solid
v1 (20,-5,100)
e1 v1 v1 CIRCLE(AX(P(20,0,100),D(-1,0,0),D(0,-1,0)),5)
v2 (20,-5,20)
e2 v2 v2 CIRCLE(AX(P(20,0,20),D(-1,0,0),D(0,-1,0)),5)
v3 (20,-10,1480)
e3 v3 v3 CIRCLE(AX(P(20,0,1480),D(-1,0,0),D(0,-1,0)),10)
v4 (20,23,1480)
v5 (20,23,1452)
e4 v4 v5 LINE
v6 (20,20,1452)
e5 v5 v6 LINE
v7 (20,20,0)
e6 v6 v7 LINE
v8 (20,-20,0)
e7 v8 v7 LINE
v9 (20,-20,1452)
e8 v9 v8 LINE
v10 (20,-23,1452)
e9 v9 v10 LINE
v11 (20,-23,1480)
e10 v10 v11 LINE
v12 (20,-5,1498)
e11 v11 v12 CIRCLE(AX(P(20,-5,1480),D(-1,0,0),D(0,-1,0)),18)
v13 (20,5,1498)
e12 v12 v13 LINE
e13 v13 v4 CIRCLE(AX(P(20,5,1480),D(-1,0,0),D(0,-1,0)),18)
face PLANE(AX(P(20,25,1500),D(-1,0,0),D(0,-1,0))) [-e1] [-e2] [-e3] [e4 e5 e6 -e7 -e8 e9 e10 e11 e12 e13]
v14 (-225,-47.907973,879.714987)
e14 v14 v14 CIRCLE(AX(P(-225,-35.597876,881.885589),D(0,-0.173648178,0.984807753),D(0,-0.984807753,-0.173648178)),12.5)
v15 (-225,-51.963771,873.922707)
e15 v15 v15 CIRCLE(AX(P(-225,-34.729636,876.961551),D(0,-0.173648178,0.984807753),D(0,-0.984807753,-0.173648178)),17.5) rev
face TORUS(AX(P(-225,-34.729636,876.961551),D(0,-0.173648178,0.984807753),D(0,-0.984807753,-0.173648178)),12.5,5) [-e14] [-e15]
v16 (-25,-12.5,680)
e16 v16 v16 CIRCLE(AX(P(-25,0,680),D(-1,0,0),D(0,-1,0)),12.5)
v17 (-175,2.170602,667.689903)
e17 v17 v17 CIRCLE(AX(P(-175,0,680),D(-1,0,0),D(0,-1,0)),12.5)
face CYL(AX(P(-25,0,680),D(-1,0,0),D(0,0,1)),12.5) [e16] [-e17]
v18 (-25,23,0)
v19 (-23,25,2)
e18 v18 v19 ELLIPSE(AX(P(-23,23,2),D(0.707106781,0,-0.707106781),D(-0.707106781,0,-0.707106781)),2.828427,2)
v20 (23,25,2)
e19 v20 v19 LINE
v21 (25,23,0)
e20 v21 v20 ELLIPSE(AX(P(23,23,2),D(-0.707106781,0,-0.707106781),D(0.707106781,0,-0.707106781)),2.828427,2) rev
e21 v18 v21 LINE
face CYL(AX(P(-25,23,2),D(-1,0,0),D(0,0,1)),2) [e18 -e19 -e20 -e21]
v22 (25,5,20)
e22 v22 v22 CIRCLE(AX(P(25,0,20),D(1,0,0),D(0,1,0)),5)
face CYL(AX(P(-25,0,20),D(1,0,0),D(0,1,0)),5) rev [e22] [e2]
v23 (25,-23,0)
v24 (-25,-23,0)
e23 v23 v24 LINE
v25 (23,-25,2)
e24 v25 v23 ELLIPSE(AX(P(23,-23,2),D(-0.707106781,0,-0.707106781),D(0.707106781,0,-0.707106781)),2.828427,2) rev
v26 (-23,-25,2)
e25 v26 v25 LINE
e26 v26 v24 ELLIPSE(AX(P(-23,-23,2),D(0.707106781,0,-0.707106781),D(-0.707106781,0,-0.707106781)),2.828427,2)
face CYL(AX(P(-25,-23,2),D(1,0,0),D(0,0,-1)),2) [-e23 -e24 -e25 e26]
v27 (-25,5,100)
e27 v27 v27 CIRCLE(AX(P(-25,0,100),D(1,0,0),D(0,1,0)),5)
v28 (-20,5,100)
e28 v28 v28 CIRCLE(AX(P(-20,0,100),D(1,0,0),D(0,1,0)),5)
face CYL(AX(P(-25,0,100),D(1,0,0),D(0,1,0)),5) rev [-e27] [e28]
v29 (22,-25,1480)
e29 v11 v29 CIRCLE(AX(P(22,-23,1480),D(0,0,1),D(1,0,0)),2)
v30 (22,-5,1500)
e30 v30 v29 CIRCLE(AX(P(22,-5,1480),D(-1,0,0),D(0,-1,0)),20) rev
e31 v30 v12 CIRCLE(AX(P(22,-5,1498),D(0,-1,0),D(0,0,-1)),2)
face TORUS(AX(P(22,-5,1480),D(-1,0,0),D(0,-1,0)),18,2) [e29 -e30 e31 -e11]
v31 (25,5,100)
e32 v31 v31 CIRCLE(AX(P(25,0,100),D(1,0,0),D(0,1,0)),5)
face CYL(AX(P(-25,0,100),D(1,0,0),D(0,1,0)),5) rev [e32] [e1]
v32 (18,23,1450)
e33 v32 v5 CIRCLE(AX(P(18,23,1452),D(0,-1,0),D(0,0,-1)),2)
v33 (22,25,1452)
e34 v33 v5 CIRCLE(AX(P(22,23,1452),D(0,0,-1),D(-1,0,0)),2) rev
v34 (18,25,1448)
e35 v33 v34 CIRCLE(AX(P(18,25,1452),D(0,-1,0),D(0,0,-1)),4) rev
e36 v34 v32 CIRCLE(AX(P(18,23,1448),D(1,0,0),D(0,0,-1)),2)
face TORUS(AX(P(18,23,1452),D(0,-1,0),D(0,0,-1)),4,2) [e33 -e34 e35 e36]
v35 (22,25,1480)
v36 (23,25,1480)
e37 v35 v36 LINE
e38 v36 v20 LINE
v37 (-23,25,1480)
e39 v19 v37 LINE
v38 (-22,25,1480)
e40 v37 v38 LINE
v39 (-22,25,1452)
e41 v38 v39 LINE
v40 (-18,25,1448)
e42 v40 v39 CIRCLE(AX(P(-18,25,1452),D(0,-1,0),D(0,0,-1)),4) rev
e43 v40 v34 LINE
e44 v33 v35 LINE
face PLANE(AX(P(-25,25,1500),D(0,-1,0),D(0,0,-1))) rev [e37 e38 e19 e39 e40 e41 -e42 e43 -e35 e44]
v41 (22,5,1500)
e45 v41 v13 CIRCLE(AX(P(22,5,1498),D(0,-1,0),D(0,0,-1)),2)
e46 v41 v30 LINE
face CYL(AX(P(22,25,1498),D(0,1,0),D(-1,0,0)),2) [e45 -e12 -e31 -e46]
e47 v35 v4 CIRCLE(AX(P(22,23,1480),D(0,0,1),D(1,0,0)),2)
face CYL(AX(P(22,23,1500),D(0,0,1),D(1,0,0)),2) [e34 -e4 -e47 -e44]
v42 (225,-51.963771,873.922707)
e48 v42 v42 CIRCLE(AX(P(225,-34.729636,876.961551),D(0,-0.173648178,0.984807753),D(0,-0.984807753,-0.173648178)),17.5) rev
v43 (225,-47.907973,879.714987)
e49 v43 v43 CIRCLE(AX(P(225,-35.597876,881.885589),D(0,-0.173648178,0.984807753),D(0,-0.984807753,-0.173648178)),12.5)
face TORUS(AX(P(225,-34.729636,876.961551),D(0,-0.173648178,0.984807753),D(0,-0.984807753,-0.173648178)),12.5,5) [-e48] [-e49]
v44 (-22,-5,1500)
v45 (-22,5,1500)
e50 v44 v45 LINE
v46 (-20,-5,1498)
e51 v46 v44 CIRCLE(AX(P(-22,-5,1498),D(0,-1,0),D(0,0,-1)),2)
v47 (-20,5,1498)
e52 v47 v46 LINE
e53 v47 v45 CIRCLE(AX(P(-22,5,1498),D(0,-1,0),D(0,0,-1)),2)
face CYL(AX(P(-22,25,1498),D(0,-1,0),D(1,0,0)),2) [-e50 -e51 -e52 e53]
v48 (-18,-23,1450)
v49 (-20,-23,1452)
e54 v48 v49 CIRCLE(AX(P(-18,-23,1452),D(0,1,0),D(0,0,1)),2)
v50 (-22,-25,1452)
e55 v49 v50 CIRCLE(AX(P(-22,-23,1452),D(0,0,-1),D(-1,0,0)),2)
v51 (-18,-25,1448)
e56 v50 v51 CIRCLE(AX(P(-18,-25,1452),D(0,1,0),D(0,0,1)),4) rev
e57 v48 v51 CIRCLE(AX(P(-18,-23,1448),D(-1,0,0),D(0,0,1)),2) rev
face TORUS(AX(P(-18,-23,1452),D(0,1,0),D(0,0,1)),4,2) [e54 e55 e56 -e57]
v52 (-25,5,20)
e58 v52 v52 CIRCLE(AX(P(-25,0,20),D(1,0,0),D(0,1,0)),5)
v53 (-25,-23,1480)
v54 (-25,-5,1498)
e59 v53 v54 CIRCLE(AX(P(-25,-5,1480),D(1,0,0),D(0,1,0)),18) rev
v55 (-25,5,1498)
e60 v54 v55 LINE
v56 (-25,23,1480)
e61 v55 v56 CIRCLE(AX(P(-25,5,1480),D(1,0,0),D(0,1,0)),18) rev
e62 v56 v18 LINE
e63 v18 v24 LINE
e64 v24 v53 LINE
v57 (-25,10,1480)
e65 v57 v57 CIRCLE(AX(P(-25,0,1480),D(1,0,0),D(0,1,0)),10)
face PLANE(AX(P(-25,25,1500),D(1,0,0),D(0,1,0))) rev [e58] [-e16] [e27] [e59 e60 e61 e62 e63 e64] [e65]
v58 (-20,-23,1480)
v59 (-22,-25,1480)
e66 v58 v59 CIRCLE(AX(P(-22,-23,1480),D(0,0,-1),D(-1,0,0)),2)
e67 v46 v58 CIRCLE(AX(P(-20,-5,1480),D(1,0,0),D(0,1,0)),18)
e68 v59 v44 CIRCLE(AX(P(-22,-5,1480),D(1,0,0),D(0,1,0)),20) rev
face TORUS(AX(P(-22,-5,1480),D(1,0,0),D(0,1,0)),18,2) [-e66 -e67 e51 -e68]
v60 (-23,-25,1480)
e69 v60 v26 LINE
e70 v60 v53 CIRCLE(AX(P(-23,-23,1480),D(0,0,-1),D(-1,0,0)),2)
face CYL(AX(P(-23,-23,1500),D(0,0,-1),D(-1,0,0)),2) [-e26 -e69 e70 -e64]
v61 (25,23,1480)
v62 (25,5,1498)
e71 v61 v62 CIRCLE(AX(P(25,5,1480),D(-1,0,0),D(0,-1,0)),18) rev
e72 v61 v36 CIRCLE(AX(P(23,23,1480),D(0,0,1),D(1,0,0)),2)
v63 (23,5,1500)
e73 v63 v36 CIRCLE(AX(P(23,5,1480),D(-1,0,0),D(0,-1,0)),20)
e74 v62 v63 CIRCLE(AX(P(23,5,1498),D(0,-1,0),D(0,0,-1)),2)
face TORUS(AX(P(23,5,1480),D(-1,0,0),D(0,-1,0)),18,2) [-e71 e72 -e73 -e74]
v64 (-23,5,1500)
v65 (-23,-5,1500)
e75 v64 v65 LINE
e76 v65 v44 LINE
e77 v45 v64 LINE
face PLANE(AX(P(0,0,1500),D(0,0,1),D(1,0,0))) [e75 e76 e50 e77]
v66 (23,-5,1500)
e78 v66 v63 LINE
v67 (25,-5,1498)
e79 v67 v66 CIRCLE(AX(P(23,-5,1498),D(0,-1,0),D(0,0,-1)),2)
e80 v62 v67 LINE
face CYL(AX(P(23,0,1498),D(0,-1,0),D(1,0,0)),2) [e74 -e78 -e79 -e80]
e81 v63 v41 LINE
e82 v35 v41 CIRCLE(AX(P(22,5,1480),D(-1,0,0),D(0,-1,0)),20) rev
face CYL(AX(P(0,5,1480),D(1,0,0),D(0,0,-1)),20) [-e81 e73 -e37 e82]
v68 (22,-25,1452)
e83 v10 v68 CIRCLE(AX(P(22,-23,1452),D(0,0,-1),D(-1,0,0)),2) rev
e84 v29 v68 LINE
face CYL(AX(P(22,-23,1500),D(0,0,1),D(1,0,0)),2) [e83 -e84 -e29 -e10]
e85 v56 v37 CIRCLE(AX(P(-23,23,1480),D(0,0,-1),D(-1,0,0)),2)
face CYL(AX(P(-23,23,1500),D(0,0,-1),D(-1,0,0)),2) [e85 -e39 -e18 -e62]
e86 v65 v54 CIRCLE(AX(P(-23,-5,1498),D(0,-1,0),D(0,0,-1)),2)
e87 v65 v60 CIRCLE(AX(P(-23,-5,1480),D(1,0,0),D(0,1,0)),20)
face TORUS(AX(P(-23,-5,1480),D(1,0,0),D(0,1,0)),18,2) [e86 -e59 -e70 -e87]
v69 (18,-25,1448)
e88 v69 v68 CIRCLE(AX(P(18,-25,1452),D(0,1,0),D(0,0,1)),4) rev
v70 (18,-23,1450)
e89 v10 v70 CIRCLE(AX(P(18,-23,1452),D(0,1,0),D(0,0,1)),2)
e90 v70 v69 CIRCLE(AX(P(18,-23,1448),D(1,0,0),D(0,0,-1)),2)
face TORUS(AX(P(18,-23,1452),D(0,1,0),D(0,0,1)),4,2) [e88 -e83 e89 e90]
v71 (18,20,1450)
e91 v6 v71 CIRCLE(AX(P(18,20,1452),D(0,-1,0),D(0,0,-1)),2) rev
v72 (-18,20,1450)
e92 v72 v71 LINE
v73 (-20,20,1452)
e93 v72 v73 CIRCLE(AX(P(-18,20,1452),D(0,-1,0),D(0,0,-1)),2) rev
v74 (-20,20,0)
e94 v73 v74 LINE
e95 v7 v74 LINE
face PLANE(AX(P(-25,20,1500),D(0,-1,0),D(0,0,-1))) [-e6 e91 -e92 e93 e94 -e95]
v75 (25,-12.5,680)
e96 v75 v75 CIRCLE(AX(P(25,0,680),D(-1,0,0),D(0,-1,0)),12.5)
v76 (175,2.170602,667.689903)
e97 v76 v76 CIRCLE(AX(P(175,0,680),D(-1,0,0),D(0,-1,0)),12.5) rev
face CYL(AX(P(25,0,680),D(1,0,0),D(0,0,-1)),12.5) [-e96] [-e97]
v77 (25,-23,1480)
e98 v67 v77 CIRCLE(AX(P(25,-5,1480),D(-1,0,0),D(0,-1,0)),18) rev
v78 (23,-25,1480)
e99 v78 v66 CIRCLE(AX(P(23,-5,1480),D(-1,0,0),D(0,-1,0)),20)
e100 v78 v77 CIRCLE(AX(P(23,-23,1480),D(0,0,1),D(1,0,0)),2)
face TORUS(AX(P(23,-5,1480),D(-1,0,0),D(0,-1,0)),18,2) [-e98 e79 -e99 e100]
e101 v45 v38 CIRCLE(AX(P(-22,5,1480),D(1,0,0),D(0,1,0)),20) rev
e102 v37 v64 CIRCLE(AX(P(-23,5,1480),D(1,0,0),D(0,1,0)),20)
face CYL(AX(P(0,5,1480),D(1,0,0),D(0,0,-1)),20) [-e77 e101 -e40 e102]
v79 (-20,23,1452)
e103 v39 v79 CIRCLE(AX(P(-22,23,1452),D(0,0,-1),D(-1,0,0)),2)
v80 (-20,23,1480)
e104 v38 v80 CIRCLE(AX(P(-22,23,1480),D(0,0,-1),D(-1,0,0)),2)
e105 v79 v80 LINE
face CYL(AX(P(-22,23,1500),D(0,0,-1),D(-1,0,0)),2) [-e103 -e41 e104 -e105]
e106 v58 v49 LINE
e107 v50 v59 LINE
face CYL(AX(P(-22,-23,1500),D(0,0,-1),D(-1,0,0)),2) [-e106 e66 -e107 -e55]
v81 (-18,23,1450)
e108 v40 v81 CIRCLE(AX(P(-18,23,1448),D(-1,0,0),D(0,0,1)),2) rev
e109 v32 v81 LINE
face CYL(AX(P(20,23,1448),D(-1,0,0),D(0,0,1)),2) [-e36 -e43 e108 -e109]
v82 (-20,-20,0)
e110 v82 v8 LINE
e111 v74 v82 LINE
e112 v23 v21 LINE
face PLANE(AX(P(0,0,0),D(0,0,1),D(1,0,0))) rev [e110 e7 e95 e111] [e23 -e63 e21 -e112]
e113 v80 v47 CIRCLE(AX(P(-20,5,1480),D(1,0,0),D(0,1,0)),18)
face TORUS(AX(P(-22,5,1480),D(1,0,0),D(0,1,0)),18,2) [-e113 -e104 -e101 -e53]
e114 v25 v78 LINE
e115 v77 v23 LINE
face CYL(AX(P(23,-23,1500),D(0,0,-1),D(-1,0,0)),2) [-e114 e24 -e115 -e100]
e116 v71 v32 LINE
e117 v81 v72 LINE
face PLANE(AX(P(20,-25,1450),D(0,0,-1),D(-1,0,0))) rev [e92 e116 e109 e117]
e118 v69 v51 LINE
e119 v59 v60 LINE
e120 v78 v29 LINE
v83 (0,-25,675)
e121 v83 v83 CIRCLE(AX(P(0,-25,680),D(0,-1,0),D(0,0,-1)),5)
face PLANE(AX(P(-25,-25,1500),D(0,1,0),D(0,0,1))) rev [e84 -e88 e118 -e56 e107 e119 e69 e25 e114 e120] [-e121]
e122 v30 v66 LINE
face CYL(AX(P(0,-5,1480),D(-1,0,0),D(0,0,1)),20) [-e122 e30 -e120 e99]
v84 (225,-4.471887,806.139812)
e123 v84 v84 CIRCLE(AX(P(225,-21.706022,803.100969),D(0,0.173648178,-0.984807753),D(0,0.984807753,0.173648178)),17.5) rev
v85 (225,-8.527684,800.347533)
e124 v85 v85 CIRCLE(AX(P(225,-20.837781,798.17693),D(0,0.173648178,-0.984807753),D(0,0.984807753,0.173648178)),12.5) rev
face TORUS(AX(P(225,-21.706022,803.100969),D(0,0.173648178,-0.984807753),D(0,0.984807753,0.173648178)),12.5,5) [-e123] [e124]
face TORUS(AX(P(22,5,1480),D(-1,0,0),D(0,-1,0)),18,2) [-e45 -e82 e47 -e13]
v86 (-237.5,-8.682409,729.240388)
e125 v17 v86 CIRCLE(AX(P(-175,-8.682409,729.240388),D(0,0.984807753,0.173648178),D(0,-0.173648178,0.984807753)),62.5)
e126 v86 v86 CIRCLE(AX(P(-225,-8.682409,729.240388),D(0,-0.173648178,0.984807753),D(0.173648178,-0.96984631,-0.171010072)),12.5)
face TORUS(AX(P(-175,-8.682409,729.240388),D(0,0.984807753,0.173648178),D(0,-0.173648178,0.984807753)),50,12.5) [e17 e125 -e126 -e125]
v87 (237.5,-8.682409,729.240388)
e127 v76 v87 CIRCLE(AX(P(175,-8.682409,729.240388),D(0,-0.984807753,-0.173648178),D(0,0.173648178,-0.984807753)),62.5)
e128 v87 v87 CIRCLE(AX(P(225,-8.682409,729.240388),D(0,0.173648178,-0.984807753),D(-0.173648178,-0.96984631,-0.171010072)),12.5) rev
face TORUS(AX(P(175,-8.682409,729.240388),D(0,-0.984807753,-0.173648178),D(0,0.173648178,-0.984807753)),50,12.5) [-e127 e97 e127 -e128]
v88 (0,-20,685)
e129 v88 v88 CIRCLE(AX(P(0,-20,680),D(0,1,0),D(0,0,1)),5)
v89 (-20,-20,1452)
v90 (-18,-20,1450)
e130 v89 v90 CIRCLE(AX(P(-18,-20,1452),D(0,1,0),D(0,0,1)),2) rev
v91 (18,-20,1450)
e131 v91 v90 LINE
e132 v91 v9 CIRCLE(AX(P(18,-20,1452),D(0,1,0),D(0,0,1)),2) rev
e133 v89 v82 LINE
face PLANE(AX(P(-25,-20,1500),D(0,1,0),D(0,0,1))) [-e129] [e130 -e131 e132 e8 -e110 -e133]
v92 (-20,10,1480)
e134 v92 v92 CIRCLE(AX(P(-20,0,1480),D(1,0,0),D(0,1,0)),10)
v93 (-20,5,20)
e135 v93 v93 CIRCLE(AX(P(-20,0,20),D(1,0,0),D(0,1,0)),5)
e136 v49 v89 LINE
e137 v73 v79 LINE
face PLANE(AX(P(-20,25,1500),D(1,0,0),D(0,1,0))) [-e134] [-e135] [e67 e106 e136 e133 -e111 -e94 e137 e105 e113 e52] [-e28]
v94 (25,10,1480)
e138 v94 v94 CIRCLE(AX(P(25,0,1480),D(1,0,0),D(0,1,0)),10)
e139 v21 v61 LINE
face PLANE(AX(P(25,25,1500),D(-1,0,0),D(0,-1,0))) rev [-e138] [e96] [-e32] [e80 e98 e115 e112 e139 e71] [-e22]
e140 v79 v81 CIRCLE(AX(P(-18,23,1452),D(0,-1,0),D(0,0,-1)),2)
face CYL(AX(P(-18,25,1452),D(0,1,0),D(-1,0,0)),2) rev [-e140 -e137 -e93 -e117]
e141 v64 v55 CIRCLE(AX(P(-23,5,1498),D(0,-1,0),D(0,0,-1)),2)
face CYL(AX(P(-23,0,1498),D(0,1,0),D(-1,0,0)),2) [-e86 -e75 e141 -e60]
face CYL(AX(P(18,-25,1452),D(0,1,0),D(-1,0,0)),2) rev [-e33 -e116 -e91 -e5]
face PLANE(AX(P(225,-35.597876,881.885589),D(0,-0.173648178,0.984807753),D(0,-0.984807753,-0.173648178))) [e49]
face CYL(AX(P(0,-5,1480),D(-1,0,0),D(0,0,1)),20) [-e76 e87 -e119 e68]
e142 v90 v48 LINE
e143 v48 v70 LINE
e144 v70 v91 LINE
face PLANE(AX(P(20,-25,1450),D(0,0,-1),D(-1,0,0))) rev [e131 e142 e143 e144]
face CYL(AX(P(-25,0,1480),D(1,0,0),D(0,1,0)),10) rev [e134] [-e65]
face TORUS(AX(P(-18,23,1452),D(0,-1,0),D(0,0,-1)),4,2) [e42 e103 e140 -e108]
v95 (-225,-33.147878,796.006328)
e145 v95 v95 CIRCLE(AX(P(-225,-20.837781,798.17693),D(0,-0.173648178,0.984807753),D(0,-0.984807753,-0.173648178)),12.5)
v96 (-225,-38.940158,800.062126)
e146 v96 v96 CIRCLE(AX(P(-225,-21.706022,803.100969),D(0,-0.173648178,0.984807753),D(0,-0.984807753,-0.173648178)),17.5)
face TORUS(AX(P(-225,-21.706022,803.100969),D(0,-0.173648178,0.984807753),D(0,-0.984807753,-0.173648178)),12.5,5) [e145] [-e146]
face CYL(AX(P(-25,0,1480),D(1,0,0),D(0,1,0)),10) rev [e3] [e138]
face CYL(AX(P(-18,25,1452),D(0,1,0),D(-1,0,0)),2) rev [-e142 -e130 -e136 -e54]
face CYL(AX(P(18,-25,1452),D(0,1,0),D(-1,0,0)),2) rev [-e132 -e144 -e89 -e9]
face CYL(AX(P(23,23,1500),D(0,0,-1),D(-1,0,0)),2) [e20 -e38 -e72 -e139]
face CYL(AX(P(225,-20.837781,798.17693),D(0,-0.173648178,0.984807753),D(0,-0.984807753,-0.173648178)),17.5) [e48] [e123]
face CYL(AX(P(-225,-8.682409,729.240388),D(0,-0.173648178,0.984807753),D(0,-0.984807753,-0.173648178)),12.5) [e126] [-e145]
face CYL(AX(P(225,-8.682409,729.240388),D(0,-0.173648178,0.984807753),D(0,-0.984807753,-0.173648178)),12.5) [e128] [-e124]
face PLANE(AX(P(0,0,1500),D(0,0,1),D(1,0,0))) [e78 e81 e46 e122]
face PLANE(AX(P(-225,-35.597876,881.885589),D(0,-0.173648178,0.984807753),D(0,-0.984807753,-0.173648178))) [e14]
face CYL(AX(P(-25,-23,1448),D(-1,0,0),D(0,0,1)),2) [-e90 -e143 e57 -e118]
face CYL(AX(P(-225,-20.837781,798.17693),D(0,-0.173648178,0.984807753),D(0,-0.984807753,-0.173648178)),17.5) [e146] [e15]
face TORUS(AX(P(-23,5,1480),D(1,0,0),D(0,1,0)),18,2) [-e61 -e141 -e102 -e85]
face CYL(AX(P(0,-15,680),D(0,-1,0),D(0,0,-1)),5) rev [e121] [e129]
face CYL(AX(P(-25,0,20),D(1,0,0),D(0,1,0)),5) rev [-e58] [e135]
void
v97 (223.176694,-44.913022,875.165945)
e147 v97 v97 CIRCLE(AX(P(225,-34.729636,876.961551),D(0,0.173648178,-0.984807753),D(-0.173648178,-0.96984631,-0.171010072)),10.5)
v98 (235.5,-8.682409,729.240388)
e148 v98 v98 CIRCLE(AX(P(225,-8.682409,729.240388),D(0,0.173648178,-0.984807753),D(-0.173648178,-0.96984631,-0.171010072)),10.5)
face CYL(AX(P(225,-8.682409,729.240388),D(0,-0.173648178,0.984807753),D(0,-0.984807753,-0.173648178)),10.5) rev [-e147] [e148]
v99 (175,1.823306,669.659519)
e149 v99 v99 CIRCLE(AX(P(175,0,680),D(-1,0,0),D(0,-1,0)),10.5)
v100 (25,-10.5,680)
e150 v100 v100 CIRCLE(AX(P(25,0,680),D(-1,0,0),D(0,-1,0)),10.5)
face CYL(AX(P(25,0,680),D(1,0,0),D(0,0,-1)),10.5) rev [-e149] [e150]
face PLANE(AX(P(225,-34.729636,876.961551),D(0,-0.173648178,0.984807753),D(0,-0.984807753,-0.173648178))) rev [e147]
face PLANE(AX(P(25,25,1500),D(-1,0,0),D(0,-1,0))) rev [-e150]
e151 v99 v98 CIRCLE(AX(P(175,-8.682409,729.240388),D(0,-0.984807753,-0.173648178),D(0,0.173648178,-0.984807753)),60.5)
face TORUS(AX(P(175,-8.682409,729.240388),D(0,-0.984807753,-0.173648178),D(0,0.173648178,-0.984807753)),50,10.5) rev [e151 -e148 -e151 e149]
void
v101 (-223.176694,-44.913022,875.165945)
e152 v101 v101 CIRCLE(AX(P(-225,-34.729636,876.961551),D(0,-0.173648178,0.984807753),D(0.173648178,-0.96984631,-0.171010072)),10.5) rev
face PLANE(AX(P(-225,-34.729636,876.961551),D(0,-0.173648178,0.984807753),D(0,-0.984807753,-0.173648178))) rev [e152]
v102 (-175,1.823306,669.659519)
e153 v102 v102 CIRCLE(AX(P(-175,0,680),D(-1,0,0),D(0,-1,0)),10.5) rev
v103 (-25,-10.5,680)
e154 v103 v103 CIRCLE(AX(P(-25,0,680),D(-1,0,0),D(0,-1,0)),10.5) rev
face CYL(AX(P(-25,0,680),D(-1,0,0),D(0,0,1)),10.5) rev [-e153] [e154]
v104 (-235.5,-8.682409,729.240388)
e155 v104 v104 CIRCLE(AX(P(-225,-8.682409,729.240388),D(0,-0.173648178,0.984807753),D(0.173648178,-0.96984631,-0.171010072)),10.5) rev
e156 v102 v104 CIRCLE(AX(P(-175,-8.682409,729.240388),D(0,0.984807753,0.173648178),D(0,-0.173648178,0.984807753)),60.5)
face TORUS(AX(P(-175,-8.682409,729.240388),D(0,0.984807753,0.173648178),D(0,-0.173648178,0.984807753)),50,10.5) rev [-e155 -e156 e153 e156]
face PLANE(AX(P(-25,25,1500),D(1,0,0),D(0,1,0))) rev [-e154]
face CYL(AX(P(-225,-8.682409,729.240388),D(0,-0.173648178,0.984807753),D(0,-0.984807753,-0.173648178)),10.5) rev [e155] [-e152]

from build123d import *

# Parameters (mm, degrees)
SKETCH_1_W             = 50
SKETCH_1_H             = 50
SKETCH_1_W_2           = 40
SKETCH_1_H_2           = 40
EXTRUDE_1_DEPTH        = 1500
SKETCH_2_R             = 5
SKETCH_2_R_2           = 10
CUT_EXTRUDE_1_DEPTH    = 1502.041305228
SKETCH_4_W             = 40
SKETCH_4_H             = 50
CUT_EXTRUDE_2_DEPTH    = 1502.041305228
FILLET_1_R             = 20
FILLET_6_R             = 2
SKETCH_7_R             = 5
CUT_EXTRUDE_3_DEPTH    = 10
SKETCH_8_R             = 12.5
SKETCH_8_R_2           = 10.5
SKETCH_10_R            = 17.5
SKETCH_10_R_2          = 12.5
EXTRUDE_2_DEPTH        = 80
EXTRUDE_START          = 5
SKETCH_11_R            = 17.5
EXTRUDE_1_2_DEPTH      = 5
FILLET_7_R             = 5
FILLET_7_OF_MIRROR_1_R = 5


with BuildPart() as part:
    # 草图1 → Extrude 1 (new body)
    with BuildSketch(Plane.XY):
        Rectangle(SKETCH_1_W, SKETCH_1_H)
        Rectangle(SKETCH_1_W_2, SKETCH_1_H_2, mode=Mode.SUBTRACT)
    extrude(amount=EXTRUDE_1_DEPTH)

    # 草图2 → 切除-拉伸1 (cut, through all)
    with BuildSketch(Plane(origin=(25, 0, 0), x_dir=(0, 0, -1), z_dir=(1, 0, 0))):
        with Locations(Location((-20, 0, 0), (0, 0, 90))):
            Circle(SKETCH_2_R)
        with Locations(Location((-100, 0, 0), (0, 0, 90))):
            Circle(SKETCH_2_R)
        with Locations(Location((-1480, 0, 0), (0, 0, 90))):
            Circle(SKETCH_2_R_2)
    extrude(amount=-CUT_EXTRUDE_1_DEPTH, mode=Mode.SUBTRACT)

    # 草图4 → 切除-拉伸2 (cut, through all)
    with BuildSketch(Plane(origin=(0, 25, 0), x_dir=(1, 0, 0), z_dir=(0, 1, 0))):
        with Locations((0, -1475)):
            Rectangle(SKETCH_4_W, SKETCH_4_H)
    extrude(amount=-CUT_EXTRUDE_2_DEPTH, mode=Mode.SUBTRACT)

    # 圆角1
    fillet_1_edges = [part.edges().sort_by_distance(p)[0] for p in [
        (22.5, 25, 1500),
        (-22.5, 25, 1500),
        (22.5, -25, 1500),
        (-22.5, -25, 1500),
    ]]
    fillet(fillet_1_edges, radius=FILLET_1_R)

    # 圆角6
    fillet_6_edges = [part.edges().sort_by_distance(p)[0] for p in [
        (0, 25, 0),
        (0, -25, 0),
        (0, -25, 1450),
        (-20, -22.5, 1450),
        (20, -22.5, 1450),
        (20, 22.5, 1450),
        (-20, -25, 1465),
        (-20, 22.5, 1450),
        (0, 25, 1450),
        (-20, 25, 1465),
        (20, 0, 1500),
        (25, 0, 1500),
        (25, 25, 740),
        (25, -25, 740),
        (25, 19.142135624, 1494.142135624),
        (25, -19.142135624, 1494.142135624),
        (20, -25, 1465),
        (-25, -25, 740),
        (20, 25, 1465),
        (20, 19.142135624, 1494.142135624),
        (20, -19.142135624, 1494.142135624),
        (-20, 0, 1500),
        (-25, 0, 1500),
        (-20, 19.142135624, 1494.142135624),
        (-20, -19.142135624, 1494.142135624),
        (-25, 25, 740),
        (-25, 19.142135624, 1494.142135624),
        (-25, -19.142135624, 1494.142135624),
    ]]
    fillet(fillet_6_edges, radius=FILLET_6_R)

    # 草图7 → 切除-拉伸3 (cut)
    with BuildSketch(Plane.XZ.offset(25)):
        with Locations(Location((0, 680, 0), (0, 0, 270))):
            Circle(SKETCH_7_R)
    extrude(amount=-CUT_EXTRUDE_3_DEPTH, mode=Mode.SUBTRACT)

    # 扫描1: sweep along a path in 草图9
    with BuildLine(Plane(origin=(0, 116.286848731, 20.504508933), x_dir=(1, 0, 0), z_dir=(0, 0.984807753012208, 0.17364817766693072))) as sweep_1_path:
        Line((-25, -669.669272048), (-175, -669.669272048))
        ThreePointArc((-175, -669.669272048), (-210.355339059, -684.313932989), (-225, -719.669272048))
        Line((-225, -719.669272048), (-225, -869.669272048))
    # 草图8 → 扫描1 (sweep)
    with BuildSketch(Plane.ZY.offset(25)):
        with Locations((680, 0)):
            Circle(SKETCH_8_R)
        with Locations((680, 0)):
            Circle(SKETCH_8_R_2, mode=Mode.SUBTRACT)
    sweep_1 = sweep(path=sweep_1_path.line)

    # 草图10 → 拉伸-薄壁2 (add)
    with BuildSketch(Plane(origin=(0, -151.016484264, 856.45704167), x_dir=(1, 0, 0), z_dir=(0, -0.17364817766693091, 0.9848077530122081))):
        with Locations((-225, 118.080760814)):
            Circle(SKETCH_10_R)
        with Locations((-225, 118.080760814)):
            Circle(SKETCH_10_R_2, mode=Mode.SUBTRACT)
    extrude_2 = extrude(amount=-EXTRUDE_2_DEPTH)

    # 草图11 → Extrude 1 2 (add)
    with BuildSketch(Plane(origin=(0, -151.016484264, 856.45704167), x_dir=(1, 0, 0), z_dir=(0, -0.17364817766693091, 0.9848077530122081)).offset(EXTRUDE_START)):
        with Locations(Location((-225, 118.080760814, 0), (0, 0, 270))):
            Circle(SKETCH_11_R)
    extrude_1_2 = extrude(amount=-EXTRUDE_1_2_DEPTH)

    # 圆角7
    # the kernel refuses this fillet: 5 mm, written as the material it takes off along each edge
    with BuildSketch(Plane(origin=(-225, -20.83778132, 798.176930361), x_dir=(1, 0, 0), z_dir=(0, -0.9848077530122081, -0.17364817766693091))) as fillet_7_piece_1:
        with BuildLine():
            CenterArc((17.5 - FILLET_7_R, FILLET_7_R), FILLET_7_R, 270, 90)
            Line((17.5, FILLET_7_R), (17.5, 0))
            Line((17.5, 0), (17.5 - FILLET_7_R, 0))
        make_face()
    revolve(axis=Axis((-225, -20.83778132, 798.176930361), (0, -0.17364817766693091, 0.9848077530122081)), mode=Mode.SUBTRACT)
    with BuildSketch(Plane(origin=(-225, -35.597876422, 881.885589368), x_dir=(0, -0.9848077530122085, -0.17364817766692792), z_dir=(-1, 0, 0))) as fillet_7_piece_2:
        with BuildLine():
            CenterArc((17.5 - FILLET_7_R, -FILLET_7_R), FILLET_7_R, 0, 90)
            Line((17.5 - FILLET_7_R, 0), (17.5, 0))
            Line((17.5, 0), (17.5, -FILLET_7_R))
        make_face()
    revolve(axis=Axis((-225, -35.597876422, 881.885589368), (0, -0.17364817766693091, 0.9848077530122081)), mode=Mode.SUBTRACT)

    # 镜向1: 扫描1, 拉伸-薄壁2, Extrude 1 2 across plane
    add(sweep_1.mirror(Plane.ZY))
    add(extrude_2.mirror(Plane.ZY))
    add(extrude_1_2.mirror(Plane.ZY))

    # 圆角7 of 镜向1
    # the kernel refuses this fillet: 5 mm, written as the material it takes off along each edge
    with BuildSketch(Plane(origin=(225, -20.83778132, 798.176930361), x_dir=(-1, 0, 0), z_dir=(0, -0.9848077530122081, -0.17364817766693091))) as fillet_7_of_mirror_1_piece_1:
        with BuildLine():
            CenterArc((17.5 - FILLET_7_OF_MIRROR_1_R, -FILLET_7_OF_MIRROR_1_R), FILLET_7_OF_MIRROR_1_R, 360, 90)
            Line((17.5, -FILLET_7_OF_MIRROR_1_R), (17.5, 0))
            Line((17.5, 0), (17.5 - FILLET_7_OF_MIRROR_1_R, 0))
        make_face()
    revolve(axis=Axis((225, -20.83778132, 798.176930361), (0, 0.17364817766693091, -0.9848077530122081)), mode=Mode.SUBTRACT)
    with BuildSketch(Plane(origin=(225, -35.597876422, 881.885589368), x_dir=(0, -0.9848077530122085, -0.17364817766692792), z_dir=(1, 0, 0))) as fillet_7_of_mirror_1_piece_2:
        with BuildLine():
            CenterArc((17.5 - FILLET_7_OF_MIRROR_1_R, FILLET_7_OF_MIRROR_1_R), FILLET_7_OF_MIRROR_1_R, 270, 90)
            Line((17.5 - FILLET_7_OF_MIRROR_1_R, 0), (17.5, 0))
            Line((17.5, 0), (17.5, FILLET_7_OF_MIRROR_1_R))
        make_face()
    revolve(axis=Axis((225, -35.597876422, 881.885589368), (0, 0.17364817766693091, -0.9848077530122081)), mode=Mode.SUBTRACT)


solid = part.part
